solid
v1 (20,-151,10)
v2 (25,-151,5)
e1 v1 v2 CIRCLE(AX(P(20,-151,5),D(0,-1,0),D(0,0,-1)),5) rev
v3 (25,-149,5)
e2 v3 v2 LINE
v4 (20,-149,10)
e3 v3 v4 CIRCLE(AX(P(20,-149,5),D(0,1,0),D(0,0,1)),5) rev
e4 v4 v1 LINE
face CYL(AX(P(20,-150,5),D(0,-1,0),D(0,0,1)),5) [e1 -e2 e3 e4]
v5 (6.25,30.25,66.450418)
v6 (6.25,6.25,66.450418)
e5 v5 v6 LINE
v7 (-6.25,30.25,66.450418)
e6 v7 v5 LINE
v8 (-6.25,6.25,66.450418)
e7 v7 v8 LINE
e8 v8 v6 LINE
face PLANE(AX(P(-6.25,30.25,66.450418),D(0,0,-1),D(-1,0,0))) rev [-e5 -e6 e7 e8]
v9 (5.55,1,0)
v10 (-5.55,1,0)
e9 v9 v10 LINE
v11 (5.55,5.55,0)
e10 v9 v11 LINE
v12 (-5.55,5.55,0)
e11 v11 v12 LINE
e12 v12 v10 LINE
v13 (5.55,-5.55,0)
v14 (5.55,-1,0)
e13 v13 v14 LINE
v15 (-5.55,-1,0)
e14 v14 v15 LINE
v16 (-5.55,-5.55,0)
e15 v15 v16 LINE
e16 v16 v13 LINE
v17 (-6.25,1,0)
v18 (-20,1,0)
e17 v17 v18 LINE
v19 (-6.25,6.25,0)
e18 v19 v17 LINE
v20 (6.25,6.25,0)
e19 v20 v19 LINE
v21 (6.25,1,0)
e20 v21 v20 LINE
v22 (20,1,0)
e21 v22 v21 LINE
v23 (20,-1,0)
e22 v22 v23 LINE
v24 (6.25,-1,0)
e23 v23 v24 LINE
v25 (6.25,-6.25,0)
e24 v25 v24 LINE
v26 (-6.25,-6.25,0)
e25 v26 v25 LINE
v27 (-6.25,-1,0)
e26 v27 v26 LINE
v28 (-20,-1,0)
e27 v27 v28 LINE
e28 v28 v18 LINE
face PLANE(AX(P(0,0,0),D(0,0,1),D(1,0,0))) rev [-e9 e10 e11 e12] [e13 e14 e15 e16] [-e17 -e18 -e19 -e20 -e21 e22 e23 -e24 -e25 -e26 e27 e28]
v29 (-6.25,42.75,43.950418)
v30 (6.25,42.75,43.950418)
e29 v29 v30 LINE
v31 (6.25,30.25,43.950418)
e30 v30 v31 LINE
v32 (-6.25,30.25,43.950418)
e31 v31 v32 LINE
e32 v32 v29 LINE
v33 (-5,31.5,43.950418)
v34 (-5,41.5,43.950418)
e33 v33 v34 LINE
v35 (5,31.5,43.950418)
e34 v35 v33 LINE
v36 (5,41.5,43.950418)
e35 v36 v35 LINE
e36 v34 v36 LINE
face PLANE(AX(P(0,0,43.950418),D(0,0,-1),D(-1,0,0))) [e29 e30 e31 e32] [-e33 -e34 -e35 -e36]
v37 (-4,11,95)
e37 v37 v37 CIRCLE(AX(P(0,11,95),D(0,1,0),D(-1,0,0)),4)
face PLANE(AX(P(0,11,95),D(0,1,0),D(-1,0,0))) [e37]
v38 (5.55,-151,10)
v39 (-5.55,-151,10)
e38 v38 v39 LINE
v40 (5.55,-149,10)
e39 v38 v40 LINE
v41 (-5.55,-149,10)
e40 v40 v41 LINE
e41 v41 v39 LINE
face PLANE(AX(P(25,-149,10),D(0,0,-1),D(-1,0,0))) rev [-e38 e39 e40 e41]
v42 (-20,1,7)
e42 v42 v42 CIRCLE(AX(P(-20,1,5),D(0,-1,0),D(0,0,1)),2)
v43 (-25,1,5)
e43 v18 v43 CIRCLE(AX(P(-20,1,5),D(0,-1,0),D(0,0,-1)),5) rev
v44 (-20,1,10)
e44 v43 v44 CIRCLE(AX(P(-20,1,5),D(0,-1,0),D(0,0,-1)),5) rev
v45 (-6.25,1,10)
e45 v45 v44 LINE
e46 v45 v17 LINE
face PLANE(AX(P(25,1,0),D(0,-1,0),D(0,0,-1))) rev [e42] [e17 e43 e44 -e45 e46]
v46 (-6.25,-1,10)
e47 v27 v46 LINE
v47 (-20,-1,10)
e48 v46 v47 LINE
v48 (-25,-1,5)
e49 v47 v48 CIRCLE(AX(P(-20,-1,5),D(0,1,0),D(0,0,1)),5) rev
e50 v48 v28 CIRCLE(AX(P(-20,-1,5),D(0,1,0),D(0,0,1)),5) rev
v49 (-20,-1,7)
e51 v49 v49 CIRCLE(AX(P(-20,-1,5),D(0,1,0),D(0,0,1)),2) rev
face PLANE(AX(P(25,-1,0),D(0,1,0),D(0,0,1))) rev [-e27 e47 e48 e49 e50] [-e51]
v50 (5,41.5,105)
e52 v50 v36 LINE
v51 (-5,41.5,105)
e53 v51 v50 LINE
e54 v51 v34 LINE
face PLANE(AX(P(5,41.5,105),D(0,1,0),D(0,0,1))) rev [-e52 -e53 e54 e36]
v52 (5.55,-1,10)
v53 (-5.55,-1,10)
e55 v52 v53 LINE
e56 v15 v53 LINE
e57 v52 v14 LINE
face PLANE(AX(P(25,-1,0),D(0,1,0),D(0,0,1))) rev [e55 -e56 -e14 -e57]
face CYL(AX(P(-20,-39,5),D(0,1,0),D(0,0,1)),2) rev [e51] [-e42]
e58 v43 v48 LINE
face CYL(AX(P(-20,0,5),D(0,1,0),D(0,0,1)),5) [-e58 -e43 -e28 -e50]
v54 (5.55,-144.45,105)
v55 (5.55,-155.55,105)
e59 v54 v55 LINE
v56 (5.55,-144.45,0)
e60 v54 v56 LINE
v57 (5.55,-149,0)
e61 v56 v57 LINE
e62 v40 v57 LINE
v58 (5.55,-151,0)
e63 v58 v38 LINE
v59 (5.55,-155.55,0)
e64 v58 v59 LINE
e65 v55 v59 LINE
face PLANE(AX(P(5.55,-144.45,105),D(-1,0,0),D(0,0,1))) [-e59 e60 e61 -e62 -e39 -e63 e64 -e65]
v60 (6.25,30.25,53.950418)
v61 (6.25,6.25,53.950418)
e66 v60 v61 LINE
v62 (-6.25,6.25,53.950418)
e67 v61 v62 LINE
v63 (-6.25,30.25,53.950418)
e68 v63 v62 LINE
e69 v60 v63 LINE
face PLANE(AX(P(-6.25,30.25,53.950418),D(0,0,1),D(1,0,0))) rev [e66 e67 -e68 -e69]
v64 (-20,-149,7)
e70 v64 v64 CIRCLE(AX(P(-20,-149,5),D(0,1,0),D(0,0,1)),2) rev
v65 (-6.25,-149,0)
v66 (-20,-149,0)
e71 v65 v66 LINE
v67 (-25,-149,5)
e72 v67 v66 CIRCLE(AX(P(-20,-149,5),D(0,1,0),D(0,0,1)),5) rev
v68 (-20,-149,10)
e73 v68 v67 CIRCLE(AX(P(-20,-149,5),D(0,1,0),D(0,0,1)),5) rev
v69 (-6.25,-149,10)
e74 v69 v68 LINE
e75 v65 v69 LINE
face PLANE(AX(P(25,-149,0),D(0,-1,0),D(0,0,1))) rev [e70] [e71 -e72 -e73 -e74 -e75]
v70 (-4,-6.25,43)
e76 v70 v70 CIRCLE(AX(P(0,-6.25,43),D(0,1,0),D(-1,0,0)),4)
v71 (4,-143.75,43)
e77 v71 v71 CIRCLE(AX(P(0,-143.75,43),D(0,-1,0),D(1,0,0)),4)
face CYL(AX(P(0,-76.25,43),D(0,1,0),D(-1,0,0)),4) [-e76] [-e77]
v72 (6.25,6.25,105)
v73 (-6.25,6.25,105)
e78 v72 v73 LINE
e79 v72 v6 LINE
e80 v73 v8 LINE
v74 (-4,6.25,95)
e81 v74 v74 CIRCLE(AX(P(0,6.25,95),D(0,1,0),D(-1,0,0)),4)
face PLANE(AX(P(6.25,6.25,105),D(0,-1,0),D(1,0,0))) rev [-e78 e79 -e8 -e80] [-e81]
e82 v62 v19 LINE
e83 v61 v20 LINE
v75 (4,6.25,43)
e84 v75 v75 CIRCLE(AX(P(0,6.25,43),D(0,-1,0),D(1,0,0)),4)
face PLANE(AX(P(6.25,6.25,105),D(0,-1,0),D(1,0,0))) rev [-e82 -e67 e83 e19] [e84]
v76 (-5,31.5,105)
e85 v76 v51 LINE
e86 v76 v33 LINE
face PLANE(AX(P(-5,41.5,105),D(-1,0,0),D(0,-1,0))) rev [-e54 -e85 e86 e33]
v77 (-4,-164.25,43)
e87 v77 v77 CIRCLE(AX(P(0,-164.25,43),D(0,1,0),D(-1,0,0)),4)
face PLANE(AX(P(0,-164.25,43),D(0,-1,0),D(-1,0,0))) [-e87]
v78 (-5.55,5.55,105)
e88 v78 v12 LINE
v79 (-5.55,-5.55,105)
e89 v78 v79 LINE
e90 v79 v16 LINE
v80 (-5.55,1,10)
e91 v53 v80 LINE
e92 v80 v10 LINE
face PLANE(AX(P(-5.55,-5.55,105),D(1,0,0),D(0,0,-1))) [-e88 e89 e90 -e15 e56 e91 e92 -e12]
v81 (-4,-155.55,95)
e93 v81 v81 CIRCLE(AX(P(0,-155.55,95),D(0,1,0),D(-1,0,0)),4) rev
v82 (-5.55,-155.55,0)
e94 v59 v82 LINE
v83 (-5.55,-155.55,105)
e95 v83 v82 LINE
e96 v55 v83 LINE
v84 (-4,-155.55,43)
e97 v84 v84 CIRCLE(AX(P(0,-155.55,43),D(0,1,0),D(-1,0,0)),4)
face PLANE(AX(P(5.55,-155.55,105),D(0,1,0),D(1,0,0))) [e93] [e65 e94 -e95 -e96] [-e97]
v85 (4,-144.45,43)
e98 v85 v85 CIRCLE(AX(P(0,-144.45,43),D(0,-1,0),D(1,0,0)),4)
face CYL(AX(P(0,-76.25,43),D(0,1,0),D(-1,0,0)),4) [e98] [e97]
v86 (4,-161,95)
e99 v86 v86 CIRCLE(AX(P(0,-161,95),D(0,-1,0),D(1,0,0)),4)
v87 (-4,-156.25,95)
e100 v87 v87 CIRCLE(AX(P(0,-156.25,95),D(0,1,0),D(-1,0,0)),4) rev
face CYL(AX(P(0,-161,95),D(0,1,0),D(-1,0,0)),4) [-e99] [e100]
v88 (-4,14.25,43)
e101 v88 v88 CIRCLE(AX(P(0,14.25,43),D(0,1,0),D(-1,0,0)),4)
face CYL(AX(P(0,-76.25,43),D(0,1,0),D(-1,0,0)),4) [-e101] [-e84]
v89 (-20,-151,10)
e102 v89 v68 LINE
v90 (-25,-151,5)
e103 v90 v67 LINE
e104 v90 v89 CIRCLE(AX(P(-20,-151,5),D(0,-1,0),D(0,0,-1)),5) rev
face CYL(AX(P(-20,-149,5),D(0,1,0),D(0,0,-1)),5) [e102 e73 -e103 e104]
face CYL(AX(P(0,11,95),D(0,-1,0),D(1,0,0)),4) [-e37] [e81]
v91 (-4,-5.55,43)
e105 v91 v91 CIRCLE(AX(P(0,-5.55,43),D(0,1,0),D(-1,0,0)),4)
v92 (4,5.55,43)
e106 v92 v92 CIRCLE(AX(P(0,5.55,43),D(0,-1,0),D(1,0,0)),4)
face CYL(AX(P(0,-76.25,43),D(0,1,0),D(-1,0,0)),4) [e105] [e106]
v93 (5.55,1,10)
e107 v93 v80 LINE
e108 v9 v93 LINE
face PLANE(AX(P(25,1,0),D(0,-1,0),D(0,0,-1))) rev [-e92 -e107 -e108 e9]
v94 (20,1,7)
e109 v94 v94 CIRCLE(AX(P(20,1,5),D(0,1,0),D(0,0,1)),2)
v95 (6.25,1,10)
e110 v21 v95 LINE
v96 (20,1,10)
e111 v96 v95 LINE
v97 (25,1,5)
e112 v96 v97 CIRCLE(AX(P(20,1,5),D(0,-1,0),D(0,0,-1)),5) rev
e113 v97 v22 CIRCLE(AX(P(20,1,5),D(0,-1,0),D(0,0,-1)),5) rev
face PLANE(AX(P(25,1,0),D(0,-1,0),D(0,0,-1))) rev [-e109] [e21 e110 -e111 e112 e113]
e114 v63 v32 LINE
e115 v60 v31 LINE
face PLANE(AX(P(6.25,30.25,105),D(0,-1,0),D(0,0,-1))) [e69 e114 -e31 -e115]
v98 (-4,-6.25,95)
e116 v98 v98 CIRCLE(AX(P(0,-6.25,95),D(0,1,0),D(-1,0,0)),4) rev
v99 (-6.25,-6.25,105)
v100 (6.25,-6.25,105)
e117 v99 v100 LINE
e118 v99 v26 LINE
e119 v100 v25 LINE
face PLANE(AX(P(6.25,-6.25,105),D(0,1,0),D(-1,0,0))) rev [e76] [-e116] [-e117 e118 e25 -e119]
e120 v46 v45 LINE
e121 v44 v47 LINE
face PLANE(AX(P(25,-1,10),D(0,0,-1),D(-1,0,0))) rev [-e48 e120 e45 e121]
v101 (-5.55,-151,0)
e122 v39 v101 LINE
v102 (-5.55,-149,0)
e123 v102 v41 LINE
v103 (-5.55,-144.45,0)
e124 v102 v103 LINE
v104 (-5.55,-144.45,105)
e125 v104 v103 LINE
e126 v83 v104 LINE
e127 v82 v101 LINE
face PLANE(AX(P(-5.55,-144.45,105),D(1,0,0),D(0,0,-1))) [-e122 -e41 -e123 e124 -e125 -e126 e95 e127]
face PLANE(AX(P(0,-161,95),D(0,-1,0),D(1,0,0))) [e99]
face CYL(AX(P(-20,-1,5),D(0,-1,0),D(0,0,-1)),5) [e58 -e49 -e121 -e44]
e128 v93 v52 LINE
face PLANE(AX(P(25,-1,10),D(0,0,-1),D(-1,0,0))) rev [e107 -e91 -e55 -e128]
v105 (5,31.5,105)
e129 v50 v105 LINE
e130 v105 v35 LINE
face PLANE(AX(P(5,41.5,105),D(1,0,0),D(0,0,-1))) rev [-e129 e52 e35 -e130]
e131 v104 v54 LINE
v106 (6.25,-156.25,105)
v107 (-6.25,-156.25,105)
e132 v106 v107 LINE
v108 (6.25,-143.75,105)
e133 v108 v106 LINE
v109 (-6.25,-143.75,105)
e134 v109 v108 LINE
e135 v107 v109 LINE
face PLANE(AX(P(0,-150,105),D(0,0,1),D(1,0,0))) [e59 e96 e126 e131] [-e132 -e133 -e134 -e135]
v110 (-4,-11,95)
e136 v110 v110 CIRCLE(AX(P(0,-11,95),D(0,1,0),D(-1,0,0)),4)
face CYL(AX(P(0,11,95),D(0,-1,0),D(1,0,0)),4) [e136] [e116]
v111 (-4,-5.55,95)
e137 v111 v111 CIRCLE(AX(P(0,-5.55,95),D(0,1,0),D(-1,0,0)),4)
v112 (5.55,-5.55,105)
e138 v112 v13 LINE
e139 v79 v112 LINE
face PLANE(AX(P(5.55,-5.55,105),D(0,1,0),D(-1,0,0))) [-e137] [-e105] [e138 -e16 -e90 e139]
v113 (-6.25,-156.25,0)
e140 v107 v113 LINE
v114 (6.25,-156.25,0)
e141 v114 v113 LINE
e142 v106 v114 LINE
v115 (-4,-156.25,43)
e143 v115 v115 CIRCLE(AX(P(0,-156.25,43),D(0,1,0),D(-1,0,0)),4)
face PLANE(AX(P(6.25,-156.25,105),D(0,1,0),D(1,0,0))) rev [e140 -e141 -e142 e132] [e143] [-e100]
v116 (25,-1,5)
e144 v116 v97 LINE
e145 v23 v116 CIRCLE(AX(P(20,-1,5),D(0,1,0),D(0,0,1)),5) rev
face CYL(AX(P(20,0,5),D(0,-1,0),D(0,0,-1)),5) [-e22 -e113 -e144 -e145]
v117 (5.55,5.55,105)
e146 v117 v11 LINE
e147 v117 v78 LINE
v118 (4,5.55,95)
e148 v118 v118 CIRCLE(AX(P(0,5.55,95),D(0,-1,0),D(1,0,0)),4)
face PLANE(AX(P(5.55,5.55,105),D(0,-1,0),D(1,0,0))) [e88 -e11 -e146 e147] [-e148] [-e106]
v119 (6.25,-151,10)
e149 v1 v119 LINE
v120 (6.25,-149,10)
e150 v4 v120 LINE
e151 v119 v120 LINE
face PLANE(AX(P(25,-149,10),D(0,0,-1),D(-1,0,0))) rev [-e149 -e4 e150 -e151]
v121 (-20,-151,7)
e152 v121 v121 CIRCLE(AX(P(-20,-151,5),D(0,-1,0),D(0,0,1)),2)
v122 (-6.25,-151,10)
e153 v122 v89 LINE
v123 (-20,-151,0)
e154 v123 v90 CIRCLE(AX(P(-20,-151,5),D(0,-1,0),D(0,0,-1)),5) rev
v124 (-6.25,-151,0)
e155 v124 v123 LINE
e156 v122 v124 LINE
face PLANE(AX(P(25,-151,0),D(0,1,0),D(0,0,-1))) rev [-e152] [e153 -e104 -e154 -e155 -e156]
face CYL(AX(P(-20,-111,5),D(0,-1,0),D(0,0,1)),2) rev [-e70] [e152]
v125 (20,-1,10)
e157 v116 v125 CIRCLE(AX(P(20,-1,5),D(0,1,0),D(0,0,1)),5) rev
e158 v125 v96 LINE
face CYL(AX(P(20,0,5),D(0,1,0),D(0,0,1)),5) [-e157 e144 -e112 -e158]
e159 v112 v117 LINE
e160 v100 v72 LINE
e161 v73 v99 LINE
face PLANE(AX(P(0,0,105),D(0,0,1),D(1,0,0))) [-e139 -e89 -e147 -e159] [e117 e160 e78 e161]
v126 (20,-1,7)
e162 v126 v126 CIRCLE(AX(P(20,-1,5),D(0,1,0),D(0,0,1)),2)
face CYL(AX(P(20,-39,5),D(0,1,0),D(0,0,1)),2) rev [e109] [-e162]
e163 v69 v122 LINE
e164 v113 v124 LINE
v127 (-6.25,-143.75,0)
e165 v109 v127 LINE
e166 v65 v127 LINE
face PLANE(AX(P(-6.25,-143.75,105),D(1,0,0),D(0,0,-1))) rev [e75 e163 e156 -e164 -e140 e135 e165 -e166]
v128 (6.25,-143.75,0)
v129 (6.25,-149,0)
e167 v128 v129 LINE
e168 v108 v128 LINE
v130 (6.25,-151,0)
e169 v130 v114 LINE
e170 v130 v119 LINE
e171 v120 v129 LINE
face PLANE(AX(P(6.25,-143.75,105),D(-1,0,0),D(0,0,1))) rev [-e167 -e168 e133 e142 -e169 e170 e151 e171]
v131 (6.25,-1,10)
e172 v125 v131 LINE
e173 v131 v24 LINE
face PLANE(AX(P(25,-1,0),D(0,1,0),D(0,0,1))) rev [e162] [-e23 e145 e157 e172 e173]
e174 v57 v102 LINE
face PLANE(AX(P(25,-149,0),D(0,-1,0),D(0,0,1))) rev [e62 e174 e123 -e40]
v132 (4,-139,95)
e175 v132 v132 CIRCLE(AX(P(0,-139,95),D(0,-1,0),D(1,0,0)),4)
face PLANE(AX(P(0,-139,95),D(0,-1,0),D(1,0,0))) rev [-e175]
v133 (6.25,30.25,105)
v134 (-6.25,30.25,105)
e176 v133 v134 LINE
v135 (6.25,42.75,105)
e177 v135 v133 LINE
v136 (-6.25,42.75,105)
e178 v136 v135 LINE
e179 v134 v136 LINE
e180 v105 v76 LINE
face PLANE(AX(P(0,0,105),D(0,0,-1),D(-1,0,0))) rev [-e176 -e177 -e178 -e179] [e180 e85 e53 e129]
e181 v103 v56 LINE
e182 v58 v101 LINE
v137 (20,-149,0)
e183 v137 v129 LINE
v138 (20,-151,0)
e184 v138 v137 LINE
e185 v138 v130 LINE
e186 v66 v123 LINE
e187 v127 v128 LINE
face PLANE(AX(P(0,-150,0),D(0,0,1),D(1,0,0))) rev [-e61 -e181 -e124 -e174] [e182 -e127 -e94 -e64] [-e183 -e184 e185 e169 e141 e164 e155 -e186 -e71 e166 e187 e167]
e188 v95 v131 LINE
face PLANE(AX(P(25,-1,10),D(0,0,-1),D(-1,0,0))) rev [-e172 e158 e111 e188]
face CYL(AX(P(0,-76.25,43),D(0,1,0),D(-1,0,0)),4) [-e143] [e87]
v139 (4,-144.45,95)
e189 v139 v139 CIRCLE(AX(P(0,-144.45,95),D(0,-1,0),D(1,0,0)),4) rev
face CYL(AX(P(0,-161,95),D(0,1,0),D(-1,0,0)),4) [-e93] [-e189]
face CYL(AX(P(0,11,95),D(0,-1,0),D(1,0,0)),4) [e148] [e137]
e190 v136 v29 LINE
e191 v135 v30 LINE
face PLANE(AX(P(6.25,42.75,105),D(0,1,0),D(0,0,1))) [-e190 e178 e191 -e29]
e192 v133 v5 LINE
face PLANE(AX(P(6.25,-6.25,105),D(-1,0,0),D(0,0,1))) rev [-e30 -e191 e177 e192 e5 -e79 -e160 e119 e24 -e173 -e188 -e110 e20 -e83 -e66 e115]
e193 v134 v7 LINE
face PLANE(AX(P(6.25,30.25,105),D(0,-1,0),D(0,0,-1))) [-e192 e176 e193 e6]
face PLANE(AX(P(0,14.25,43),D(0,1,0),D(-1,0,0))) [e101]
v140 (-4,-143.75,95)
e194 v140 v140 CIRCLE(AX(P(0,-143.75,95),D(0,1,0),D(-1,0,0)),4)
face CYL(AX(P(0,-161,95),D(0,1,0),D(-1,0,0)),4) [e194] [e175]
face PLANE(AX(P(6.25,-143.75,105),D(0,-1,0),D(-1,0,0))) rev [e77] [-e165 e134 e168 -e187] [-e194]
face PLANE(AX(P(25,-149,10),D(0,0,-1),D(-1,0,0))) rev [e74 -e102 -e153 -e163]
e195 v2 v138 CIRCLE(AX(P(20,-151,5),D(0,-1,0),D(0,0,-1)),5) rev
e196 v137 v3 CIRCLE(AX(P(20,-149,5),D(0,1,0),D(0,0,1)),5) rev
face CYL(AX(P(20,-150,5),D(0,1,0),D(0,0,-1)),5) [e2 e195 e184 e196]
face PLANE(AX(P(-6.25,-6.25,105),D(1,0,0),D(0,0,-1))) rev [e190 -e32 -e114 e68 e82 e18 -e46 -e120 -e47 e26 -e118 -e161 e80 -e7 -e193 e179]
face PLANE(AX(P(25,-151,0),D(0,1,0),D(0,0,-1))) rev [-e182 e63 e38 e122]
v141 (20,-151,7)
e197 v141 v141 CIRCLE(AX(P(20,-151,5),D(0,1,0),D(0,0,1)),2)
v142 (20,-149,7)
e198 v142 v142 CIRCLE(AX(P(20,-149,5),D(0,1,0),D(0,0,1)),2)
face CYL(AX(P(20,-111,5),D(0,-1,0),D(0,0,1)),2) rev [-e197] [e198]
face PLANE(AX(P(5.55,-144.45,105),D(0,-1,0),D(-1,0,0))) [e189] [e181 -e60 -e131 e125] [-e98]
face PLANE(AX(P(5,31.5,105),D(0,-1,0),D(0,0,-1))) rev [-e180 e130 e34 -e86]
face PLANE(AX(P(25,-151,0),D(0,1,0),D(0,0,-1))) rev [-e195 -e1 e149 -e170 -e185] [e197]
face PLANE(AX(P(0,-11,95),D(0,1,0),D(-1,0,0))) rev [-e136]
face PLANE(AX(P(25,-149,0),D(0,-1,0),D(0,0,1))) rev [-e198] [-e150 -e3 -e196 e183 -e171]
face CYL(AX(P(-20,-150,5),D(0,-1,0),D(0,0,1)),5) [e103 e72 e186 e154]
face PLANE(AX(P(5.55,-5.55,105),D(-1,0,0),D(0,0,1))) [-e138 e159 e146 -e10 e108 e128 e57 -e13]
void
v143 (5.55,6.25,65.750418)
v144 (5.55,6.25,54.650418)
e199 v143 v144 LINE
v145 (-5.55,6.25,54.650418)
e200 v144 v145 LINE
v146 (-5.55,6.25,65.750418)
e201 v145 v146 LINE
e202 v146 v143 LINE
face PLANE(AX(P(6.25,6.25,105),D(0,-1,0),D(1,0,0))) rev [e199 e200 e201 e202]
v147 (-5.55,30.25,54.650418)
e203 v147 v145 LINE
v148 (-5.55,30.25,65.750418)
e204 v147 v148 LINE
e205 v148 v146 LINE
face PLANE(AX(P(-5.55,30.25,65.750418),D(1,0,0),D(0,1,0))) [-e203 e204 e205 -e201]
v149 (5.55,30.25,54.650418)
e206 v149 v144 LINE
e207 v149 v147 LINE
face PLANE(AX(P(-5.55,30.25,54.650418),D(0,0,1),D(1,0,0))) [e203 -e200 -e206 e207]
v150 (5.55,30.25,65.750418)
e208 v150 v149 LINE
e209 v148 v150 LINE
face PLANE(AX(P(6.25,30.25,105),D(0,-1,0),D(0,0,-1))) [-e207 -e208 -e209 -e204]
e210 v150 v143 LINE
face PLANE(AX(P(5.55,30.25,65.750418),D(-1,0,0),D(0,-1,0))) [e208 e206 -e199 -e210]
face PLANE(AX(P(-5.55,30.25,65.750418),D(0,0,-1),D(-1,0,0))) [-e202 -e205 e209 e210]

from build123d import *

# Parameters (mm, degrees)
SKETCH2_W                = 12.5
SKETCH2_H                = 12.5
SKETCH2_W_2              = 11.1
SKETCH2_H_2              = 11.1
BOSS_EXTRUDE1_DEPTH      = 105
SKETCH3_R                = 4
CUT_EXTRUDE1_DEPTH       = 105
SKETCH4_W                = 10
SKETCH4_H                = 2
BOSS_EXTRUDE2_DEPTH      = 25
FILLET1_R                = 5
SKETCH5_R                = 2
CUT_EXTRUDE2_DEPTH       = 40
BOSS_EXTRUDE3_START      = -82.5
SKETCH6_R                = 4
BOSS_EXTRUDE3_DEPTH      = 90.5
SKETCH8_W                = 12.5
SKETCH8_H                = 12.5
SKETCH8_W_2              = 11.1
SKETCH8_H_2              = 11.1
BOSS_EXTRUDE4_DEPTH      = 24
BOSS_EXTRUDE5_DEPTH      = 10
BOSS_EXTRUDE5_DEPTH_BACK = 51.049582
SKETCH9_W                = 12.5
SKETCH9_H                = 12.5
SKETCH9_W_2              = 10
SKETCH9_H_2              = 10
SKETCH11_R               = 4
BOSS_EXTRUDE6_DEPTH      = 11
SKETCH12_R               = 4
BOSS_EXTRUDE7_DEPTH      = 11


with BuildPart() as part:
    # Sketch2 → Boss-Extrude1 (new body)
    with BuildSketch(Plane.XY):
        Rectangle(SKETCH2_W, SKETCH2_H)
        Rectangle(SKETCH2_W_2, SKETCH2_H_2, mode=Mode.SUBTRACT)
    extrude(amount=BOSS_EXTRUDE1_DEPTH)

    # Sketch3 → Cut-Extrude1 (cut)
    with BuildSketch(Plane(origin=(0, 6.25, 0), x_dir=(1, 0, 0), z_dir=(0, 1, 0))):
        with Locations(Location((0, -95, 0), (0, 0, 180))):
            Circle(SKETCH3_R)
    extrude(amount=-CUT_EXTRUDE1_DEPTH, mode=Mode.SUBTRACT)

    # Sketch4 → Boss-Extrude2 (add, symmetric)
    with BuildSketch(Plane(origin=(0, 0, 0), x_dir=(0, 0, -1), z_dir=(1, 0, 0))):
        with Locations((-5, 0)):
            Rectangle(SKETCH4_W, SKETCH4_H)
    extrude(amount=BOSS_EXTRUDE2_DEPTH, both=True)

    # Fillet1
    fillet1_edges = [part.edges().sort_by_distance(p)[0] for p in [
        (-25, 0, 10),
        (-25, 0, 0),
        (25, 0, 10),
        (25, 0, 0),
    ]]
    fillet(fillet1_edges, radius=FILLET1_R - 0.0001)  # a hair under: the kernel refuses the full size

    # Sketch5 → Cut-Extrude2 (cut)
    with BuildSketch(Plane(origin=(0, 1, 0), x_dir=(1, 0, 0), z_dir=(0, 1, 0))):
        with Locations(Location((20, -5, 0), (0, 0, 270))):
            Circle(SKETCH5_R)
    cut_extrude2 = extrude(amount=-CUT_EXTRUDE2_DEPTH, mode=Mode.SUBTRACT)

    # Mirror1: Cut-Extrude2 across plane
    add(cut_extrude2.mirror(Plane(origin=(0, 0, 0), x_dir=(0, 0, 1), z_dir=(1, 0, 0))), mode=Mode.SUBTRACT)


with BuildPart() as body_2:
    # Mirror3: mirrored copy
    add(part.part.mirror(Plane(origin=(0, -75, 0), x_dir=(0, 0, 1), z_dir=(0, -1, 0))))



with BuildPart() as part_1:
    add(part.part)

    # Sketch6 → Boss-Extrude3 (add)
    with BuildSketch(Plane(origin=(0, 6.25, 0), x_dir=(1, 0, 0), z_dir=(0, 1, 0)).offset(BOSS_EXTRUDE3_START)):
        with Locations(Location((0, -43, 0), (0, 0, 180))):
            Circle(SKETCH6_R)
    boss_extrude3 = extrude(amount=BOSS_EXTRUDE3_DEPTH)

    # Mirror4: Boss-Extrude3 across plane
    add(boss_extrude3.mirror(Plane(origin=(0, -75, 0), x_dir=(0, 0, 1), z_dir=(0, -1, 0))))

    # Sketch8 → Boss-Extrude4 (add)
    with BuildSketch(Plane(origin=(0, 6.25, 0), x_dir=(1, 0, 0), z_dir=(0, 1, 0))):
        with Locations((0, -60.200417772)):
            Rectangle(SKETCH8_W, SKETCH8_H)
        with Locations((0, -60.200417772)):
            Rectangle(SKETCH8_W_2, SKETCH8_H_2, mode=Mode.SUBTRACT)
    extrude(amount=BOSS_EXTRUDE4_DEPTH)

    # Sketch9 → Boss-Extrude5 (add, two sides: drawn at the far end of the back side and taken through both)
    with BuildSketch(Plane(origin=(0, 0, 53.950417772), x_dir=(-1, 0, 0), z_dir=(0, 0, -1)).offset(-BOSS_EXTRUDE5_DEPTH_BACK)):
        with Locations((0, 36.5)):
            Rectangle(SKETCH9_W, SKETCH9_H)
        with Locations((0, 36.5)):
            Rectangle(SKETCH9_W_2, SKETCH9_H_2, mode=Mode.SUBTRACT)
    extrude(amount=BOSS_EXTRUDE5_DEPTH + BOSS_EXTRUDE5_DEPTH_BACK)

    # Sketch11 → Boss-Extrude6 (add, symmetric)
    with BuildSketch(Plane(origin=(0, 0, 0), x_dir=(1, 0, 0), z_dir=(0, 1, 0))):
        with Locations(Location((0, -95, 0), (0, 0, 180))):
            Circle(SKETCH11_R)
    extrude(amount=BOSS_EXTRUDE6_DEPTH, both=True)


with BuildPart() as body_2_1:
    add(body_2.part)

    add(part_1.part)  # Boss-Extrude7 merges part
    # Sketch12 → Boss-Extrude7 (add, symmetric)
    with BuildSketch(Plane(origin=(0, -150, 0), x_dir=(-1, 0, 0), z_dir=(0, -1, 0))):
        with Locations((0, -95)):
            Circle(SKETCH12_R)
    extrude(amount=BOSS_EXTRUDE7_DEPTH, both=True)


solid = body_2_1.part
